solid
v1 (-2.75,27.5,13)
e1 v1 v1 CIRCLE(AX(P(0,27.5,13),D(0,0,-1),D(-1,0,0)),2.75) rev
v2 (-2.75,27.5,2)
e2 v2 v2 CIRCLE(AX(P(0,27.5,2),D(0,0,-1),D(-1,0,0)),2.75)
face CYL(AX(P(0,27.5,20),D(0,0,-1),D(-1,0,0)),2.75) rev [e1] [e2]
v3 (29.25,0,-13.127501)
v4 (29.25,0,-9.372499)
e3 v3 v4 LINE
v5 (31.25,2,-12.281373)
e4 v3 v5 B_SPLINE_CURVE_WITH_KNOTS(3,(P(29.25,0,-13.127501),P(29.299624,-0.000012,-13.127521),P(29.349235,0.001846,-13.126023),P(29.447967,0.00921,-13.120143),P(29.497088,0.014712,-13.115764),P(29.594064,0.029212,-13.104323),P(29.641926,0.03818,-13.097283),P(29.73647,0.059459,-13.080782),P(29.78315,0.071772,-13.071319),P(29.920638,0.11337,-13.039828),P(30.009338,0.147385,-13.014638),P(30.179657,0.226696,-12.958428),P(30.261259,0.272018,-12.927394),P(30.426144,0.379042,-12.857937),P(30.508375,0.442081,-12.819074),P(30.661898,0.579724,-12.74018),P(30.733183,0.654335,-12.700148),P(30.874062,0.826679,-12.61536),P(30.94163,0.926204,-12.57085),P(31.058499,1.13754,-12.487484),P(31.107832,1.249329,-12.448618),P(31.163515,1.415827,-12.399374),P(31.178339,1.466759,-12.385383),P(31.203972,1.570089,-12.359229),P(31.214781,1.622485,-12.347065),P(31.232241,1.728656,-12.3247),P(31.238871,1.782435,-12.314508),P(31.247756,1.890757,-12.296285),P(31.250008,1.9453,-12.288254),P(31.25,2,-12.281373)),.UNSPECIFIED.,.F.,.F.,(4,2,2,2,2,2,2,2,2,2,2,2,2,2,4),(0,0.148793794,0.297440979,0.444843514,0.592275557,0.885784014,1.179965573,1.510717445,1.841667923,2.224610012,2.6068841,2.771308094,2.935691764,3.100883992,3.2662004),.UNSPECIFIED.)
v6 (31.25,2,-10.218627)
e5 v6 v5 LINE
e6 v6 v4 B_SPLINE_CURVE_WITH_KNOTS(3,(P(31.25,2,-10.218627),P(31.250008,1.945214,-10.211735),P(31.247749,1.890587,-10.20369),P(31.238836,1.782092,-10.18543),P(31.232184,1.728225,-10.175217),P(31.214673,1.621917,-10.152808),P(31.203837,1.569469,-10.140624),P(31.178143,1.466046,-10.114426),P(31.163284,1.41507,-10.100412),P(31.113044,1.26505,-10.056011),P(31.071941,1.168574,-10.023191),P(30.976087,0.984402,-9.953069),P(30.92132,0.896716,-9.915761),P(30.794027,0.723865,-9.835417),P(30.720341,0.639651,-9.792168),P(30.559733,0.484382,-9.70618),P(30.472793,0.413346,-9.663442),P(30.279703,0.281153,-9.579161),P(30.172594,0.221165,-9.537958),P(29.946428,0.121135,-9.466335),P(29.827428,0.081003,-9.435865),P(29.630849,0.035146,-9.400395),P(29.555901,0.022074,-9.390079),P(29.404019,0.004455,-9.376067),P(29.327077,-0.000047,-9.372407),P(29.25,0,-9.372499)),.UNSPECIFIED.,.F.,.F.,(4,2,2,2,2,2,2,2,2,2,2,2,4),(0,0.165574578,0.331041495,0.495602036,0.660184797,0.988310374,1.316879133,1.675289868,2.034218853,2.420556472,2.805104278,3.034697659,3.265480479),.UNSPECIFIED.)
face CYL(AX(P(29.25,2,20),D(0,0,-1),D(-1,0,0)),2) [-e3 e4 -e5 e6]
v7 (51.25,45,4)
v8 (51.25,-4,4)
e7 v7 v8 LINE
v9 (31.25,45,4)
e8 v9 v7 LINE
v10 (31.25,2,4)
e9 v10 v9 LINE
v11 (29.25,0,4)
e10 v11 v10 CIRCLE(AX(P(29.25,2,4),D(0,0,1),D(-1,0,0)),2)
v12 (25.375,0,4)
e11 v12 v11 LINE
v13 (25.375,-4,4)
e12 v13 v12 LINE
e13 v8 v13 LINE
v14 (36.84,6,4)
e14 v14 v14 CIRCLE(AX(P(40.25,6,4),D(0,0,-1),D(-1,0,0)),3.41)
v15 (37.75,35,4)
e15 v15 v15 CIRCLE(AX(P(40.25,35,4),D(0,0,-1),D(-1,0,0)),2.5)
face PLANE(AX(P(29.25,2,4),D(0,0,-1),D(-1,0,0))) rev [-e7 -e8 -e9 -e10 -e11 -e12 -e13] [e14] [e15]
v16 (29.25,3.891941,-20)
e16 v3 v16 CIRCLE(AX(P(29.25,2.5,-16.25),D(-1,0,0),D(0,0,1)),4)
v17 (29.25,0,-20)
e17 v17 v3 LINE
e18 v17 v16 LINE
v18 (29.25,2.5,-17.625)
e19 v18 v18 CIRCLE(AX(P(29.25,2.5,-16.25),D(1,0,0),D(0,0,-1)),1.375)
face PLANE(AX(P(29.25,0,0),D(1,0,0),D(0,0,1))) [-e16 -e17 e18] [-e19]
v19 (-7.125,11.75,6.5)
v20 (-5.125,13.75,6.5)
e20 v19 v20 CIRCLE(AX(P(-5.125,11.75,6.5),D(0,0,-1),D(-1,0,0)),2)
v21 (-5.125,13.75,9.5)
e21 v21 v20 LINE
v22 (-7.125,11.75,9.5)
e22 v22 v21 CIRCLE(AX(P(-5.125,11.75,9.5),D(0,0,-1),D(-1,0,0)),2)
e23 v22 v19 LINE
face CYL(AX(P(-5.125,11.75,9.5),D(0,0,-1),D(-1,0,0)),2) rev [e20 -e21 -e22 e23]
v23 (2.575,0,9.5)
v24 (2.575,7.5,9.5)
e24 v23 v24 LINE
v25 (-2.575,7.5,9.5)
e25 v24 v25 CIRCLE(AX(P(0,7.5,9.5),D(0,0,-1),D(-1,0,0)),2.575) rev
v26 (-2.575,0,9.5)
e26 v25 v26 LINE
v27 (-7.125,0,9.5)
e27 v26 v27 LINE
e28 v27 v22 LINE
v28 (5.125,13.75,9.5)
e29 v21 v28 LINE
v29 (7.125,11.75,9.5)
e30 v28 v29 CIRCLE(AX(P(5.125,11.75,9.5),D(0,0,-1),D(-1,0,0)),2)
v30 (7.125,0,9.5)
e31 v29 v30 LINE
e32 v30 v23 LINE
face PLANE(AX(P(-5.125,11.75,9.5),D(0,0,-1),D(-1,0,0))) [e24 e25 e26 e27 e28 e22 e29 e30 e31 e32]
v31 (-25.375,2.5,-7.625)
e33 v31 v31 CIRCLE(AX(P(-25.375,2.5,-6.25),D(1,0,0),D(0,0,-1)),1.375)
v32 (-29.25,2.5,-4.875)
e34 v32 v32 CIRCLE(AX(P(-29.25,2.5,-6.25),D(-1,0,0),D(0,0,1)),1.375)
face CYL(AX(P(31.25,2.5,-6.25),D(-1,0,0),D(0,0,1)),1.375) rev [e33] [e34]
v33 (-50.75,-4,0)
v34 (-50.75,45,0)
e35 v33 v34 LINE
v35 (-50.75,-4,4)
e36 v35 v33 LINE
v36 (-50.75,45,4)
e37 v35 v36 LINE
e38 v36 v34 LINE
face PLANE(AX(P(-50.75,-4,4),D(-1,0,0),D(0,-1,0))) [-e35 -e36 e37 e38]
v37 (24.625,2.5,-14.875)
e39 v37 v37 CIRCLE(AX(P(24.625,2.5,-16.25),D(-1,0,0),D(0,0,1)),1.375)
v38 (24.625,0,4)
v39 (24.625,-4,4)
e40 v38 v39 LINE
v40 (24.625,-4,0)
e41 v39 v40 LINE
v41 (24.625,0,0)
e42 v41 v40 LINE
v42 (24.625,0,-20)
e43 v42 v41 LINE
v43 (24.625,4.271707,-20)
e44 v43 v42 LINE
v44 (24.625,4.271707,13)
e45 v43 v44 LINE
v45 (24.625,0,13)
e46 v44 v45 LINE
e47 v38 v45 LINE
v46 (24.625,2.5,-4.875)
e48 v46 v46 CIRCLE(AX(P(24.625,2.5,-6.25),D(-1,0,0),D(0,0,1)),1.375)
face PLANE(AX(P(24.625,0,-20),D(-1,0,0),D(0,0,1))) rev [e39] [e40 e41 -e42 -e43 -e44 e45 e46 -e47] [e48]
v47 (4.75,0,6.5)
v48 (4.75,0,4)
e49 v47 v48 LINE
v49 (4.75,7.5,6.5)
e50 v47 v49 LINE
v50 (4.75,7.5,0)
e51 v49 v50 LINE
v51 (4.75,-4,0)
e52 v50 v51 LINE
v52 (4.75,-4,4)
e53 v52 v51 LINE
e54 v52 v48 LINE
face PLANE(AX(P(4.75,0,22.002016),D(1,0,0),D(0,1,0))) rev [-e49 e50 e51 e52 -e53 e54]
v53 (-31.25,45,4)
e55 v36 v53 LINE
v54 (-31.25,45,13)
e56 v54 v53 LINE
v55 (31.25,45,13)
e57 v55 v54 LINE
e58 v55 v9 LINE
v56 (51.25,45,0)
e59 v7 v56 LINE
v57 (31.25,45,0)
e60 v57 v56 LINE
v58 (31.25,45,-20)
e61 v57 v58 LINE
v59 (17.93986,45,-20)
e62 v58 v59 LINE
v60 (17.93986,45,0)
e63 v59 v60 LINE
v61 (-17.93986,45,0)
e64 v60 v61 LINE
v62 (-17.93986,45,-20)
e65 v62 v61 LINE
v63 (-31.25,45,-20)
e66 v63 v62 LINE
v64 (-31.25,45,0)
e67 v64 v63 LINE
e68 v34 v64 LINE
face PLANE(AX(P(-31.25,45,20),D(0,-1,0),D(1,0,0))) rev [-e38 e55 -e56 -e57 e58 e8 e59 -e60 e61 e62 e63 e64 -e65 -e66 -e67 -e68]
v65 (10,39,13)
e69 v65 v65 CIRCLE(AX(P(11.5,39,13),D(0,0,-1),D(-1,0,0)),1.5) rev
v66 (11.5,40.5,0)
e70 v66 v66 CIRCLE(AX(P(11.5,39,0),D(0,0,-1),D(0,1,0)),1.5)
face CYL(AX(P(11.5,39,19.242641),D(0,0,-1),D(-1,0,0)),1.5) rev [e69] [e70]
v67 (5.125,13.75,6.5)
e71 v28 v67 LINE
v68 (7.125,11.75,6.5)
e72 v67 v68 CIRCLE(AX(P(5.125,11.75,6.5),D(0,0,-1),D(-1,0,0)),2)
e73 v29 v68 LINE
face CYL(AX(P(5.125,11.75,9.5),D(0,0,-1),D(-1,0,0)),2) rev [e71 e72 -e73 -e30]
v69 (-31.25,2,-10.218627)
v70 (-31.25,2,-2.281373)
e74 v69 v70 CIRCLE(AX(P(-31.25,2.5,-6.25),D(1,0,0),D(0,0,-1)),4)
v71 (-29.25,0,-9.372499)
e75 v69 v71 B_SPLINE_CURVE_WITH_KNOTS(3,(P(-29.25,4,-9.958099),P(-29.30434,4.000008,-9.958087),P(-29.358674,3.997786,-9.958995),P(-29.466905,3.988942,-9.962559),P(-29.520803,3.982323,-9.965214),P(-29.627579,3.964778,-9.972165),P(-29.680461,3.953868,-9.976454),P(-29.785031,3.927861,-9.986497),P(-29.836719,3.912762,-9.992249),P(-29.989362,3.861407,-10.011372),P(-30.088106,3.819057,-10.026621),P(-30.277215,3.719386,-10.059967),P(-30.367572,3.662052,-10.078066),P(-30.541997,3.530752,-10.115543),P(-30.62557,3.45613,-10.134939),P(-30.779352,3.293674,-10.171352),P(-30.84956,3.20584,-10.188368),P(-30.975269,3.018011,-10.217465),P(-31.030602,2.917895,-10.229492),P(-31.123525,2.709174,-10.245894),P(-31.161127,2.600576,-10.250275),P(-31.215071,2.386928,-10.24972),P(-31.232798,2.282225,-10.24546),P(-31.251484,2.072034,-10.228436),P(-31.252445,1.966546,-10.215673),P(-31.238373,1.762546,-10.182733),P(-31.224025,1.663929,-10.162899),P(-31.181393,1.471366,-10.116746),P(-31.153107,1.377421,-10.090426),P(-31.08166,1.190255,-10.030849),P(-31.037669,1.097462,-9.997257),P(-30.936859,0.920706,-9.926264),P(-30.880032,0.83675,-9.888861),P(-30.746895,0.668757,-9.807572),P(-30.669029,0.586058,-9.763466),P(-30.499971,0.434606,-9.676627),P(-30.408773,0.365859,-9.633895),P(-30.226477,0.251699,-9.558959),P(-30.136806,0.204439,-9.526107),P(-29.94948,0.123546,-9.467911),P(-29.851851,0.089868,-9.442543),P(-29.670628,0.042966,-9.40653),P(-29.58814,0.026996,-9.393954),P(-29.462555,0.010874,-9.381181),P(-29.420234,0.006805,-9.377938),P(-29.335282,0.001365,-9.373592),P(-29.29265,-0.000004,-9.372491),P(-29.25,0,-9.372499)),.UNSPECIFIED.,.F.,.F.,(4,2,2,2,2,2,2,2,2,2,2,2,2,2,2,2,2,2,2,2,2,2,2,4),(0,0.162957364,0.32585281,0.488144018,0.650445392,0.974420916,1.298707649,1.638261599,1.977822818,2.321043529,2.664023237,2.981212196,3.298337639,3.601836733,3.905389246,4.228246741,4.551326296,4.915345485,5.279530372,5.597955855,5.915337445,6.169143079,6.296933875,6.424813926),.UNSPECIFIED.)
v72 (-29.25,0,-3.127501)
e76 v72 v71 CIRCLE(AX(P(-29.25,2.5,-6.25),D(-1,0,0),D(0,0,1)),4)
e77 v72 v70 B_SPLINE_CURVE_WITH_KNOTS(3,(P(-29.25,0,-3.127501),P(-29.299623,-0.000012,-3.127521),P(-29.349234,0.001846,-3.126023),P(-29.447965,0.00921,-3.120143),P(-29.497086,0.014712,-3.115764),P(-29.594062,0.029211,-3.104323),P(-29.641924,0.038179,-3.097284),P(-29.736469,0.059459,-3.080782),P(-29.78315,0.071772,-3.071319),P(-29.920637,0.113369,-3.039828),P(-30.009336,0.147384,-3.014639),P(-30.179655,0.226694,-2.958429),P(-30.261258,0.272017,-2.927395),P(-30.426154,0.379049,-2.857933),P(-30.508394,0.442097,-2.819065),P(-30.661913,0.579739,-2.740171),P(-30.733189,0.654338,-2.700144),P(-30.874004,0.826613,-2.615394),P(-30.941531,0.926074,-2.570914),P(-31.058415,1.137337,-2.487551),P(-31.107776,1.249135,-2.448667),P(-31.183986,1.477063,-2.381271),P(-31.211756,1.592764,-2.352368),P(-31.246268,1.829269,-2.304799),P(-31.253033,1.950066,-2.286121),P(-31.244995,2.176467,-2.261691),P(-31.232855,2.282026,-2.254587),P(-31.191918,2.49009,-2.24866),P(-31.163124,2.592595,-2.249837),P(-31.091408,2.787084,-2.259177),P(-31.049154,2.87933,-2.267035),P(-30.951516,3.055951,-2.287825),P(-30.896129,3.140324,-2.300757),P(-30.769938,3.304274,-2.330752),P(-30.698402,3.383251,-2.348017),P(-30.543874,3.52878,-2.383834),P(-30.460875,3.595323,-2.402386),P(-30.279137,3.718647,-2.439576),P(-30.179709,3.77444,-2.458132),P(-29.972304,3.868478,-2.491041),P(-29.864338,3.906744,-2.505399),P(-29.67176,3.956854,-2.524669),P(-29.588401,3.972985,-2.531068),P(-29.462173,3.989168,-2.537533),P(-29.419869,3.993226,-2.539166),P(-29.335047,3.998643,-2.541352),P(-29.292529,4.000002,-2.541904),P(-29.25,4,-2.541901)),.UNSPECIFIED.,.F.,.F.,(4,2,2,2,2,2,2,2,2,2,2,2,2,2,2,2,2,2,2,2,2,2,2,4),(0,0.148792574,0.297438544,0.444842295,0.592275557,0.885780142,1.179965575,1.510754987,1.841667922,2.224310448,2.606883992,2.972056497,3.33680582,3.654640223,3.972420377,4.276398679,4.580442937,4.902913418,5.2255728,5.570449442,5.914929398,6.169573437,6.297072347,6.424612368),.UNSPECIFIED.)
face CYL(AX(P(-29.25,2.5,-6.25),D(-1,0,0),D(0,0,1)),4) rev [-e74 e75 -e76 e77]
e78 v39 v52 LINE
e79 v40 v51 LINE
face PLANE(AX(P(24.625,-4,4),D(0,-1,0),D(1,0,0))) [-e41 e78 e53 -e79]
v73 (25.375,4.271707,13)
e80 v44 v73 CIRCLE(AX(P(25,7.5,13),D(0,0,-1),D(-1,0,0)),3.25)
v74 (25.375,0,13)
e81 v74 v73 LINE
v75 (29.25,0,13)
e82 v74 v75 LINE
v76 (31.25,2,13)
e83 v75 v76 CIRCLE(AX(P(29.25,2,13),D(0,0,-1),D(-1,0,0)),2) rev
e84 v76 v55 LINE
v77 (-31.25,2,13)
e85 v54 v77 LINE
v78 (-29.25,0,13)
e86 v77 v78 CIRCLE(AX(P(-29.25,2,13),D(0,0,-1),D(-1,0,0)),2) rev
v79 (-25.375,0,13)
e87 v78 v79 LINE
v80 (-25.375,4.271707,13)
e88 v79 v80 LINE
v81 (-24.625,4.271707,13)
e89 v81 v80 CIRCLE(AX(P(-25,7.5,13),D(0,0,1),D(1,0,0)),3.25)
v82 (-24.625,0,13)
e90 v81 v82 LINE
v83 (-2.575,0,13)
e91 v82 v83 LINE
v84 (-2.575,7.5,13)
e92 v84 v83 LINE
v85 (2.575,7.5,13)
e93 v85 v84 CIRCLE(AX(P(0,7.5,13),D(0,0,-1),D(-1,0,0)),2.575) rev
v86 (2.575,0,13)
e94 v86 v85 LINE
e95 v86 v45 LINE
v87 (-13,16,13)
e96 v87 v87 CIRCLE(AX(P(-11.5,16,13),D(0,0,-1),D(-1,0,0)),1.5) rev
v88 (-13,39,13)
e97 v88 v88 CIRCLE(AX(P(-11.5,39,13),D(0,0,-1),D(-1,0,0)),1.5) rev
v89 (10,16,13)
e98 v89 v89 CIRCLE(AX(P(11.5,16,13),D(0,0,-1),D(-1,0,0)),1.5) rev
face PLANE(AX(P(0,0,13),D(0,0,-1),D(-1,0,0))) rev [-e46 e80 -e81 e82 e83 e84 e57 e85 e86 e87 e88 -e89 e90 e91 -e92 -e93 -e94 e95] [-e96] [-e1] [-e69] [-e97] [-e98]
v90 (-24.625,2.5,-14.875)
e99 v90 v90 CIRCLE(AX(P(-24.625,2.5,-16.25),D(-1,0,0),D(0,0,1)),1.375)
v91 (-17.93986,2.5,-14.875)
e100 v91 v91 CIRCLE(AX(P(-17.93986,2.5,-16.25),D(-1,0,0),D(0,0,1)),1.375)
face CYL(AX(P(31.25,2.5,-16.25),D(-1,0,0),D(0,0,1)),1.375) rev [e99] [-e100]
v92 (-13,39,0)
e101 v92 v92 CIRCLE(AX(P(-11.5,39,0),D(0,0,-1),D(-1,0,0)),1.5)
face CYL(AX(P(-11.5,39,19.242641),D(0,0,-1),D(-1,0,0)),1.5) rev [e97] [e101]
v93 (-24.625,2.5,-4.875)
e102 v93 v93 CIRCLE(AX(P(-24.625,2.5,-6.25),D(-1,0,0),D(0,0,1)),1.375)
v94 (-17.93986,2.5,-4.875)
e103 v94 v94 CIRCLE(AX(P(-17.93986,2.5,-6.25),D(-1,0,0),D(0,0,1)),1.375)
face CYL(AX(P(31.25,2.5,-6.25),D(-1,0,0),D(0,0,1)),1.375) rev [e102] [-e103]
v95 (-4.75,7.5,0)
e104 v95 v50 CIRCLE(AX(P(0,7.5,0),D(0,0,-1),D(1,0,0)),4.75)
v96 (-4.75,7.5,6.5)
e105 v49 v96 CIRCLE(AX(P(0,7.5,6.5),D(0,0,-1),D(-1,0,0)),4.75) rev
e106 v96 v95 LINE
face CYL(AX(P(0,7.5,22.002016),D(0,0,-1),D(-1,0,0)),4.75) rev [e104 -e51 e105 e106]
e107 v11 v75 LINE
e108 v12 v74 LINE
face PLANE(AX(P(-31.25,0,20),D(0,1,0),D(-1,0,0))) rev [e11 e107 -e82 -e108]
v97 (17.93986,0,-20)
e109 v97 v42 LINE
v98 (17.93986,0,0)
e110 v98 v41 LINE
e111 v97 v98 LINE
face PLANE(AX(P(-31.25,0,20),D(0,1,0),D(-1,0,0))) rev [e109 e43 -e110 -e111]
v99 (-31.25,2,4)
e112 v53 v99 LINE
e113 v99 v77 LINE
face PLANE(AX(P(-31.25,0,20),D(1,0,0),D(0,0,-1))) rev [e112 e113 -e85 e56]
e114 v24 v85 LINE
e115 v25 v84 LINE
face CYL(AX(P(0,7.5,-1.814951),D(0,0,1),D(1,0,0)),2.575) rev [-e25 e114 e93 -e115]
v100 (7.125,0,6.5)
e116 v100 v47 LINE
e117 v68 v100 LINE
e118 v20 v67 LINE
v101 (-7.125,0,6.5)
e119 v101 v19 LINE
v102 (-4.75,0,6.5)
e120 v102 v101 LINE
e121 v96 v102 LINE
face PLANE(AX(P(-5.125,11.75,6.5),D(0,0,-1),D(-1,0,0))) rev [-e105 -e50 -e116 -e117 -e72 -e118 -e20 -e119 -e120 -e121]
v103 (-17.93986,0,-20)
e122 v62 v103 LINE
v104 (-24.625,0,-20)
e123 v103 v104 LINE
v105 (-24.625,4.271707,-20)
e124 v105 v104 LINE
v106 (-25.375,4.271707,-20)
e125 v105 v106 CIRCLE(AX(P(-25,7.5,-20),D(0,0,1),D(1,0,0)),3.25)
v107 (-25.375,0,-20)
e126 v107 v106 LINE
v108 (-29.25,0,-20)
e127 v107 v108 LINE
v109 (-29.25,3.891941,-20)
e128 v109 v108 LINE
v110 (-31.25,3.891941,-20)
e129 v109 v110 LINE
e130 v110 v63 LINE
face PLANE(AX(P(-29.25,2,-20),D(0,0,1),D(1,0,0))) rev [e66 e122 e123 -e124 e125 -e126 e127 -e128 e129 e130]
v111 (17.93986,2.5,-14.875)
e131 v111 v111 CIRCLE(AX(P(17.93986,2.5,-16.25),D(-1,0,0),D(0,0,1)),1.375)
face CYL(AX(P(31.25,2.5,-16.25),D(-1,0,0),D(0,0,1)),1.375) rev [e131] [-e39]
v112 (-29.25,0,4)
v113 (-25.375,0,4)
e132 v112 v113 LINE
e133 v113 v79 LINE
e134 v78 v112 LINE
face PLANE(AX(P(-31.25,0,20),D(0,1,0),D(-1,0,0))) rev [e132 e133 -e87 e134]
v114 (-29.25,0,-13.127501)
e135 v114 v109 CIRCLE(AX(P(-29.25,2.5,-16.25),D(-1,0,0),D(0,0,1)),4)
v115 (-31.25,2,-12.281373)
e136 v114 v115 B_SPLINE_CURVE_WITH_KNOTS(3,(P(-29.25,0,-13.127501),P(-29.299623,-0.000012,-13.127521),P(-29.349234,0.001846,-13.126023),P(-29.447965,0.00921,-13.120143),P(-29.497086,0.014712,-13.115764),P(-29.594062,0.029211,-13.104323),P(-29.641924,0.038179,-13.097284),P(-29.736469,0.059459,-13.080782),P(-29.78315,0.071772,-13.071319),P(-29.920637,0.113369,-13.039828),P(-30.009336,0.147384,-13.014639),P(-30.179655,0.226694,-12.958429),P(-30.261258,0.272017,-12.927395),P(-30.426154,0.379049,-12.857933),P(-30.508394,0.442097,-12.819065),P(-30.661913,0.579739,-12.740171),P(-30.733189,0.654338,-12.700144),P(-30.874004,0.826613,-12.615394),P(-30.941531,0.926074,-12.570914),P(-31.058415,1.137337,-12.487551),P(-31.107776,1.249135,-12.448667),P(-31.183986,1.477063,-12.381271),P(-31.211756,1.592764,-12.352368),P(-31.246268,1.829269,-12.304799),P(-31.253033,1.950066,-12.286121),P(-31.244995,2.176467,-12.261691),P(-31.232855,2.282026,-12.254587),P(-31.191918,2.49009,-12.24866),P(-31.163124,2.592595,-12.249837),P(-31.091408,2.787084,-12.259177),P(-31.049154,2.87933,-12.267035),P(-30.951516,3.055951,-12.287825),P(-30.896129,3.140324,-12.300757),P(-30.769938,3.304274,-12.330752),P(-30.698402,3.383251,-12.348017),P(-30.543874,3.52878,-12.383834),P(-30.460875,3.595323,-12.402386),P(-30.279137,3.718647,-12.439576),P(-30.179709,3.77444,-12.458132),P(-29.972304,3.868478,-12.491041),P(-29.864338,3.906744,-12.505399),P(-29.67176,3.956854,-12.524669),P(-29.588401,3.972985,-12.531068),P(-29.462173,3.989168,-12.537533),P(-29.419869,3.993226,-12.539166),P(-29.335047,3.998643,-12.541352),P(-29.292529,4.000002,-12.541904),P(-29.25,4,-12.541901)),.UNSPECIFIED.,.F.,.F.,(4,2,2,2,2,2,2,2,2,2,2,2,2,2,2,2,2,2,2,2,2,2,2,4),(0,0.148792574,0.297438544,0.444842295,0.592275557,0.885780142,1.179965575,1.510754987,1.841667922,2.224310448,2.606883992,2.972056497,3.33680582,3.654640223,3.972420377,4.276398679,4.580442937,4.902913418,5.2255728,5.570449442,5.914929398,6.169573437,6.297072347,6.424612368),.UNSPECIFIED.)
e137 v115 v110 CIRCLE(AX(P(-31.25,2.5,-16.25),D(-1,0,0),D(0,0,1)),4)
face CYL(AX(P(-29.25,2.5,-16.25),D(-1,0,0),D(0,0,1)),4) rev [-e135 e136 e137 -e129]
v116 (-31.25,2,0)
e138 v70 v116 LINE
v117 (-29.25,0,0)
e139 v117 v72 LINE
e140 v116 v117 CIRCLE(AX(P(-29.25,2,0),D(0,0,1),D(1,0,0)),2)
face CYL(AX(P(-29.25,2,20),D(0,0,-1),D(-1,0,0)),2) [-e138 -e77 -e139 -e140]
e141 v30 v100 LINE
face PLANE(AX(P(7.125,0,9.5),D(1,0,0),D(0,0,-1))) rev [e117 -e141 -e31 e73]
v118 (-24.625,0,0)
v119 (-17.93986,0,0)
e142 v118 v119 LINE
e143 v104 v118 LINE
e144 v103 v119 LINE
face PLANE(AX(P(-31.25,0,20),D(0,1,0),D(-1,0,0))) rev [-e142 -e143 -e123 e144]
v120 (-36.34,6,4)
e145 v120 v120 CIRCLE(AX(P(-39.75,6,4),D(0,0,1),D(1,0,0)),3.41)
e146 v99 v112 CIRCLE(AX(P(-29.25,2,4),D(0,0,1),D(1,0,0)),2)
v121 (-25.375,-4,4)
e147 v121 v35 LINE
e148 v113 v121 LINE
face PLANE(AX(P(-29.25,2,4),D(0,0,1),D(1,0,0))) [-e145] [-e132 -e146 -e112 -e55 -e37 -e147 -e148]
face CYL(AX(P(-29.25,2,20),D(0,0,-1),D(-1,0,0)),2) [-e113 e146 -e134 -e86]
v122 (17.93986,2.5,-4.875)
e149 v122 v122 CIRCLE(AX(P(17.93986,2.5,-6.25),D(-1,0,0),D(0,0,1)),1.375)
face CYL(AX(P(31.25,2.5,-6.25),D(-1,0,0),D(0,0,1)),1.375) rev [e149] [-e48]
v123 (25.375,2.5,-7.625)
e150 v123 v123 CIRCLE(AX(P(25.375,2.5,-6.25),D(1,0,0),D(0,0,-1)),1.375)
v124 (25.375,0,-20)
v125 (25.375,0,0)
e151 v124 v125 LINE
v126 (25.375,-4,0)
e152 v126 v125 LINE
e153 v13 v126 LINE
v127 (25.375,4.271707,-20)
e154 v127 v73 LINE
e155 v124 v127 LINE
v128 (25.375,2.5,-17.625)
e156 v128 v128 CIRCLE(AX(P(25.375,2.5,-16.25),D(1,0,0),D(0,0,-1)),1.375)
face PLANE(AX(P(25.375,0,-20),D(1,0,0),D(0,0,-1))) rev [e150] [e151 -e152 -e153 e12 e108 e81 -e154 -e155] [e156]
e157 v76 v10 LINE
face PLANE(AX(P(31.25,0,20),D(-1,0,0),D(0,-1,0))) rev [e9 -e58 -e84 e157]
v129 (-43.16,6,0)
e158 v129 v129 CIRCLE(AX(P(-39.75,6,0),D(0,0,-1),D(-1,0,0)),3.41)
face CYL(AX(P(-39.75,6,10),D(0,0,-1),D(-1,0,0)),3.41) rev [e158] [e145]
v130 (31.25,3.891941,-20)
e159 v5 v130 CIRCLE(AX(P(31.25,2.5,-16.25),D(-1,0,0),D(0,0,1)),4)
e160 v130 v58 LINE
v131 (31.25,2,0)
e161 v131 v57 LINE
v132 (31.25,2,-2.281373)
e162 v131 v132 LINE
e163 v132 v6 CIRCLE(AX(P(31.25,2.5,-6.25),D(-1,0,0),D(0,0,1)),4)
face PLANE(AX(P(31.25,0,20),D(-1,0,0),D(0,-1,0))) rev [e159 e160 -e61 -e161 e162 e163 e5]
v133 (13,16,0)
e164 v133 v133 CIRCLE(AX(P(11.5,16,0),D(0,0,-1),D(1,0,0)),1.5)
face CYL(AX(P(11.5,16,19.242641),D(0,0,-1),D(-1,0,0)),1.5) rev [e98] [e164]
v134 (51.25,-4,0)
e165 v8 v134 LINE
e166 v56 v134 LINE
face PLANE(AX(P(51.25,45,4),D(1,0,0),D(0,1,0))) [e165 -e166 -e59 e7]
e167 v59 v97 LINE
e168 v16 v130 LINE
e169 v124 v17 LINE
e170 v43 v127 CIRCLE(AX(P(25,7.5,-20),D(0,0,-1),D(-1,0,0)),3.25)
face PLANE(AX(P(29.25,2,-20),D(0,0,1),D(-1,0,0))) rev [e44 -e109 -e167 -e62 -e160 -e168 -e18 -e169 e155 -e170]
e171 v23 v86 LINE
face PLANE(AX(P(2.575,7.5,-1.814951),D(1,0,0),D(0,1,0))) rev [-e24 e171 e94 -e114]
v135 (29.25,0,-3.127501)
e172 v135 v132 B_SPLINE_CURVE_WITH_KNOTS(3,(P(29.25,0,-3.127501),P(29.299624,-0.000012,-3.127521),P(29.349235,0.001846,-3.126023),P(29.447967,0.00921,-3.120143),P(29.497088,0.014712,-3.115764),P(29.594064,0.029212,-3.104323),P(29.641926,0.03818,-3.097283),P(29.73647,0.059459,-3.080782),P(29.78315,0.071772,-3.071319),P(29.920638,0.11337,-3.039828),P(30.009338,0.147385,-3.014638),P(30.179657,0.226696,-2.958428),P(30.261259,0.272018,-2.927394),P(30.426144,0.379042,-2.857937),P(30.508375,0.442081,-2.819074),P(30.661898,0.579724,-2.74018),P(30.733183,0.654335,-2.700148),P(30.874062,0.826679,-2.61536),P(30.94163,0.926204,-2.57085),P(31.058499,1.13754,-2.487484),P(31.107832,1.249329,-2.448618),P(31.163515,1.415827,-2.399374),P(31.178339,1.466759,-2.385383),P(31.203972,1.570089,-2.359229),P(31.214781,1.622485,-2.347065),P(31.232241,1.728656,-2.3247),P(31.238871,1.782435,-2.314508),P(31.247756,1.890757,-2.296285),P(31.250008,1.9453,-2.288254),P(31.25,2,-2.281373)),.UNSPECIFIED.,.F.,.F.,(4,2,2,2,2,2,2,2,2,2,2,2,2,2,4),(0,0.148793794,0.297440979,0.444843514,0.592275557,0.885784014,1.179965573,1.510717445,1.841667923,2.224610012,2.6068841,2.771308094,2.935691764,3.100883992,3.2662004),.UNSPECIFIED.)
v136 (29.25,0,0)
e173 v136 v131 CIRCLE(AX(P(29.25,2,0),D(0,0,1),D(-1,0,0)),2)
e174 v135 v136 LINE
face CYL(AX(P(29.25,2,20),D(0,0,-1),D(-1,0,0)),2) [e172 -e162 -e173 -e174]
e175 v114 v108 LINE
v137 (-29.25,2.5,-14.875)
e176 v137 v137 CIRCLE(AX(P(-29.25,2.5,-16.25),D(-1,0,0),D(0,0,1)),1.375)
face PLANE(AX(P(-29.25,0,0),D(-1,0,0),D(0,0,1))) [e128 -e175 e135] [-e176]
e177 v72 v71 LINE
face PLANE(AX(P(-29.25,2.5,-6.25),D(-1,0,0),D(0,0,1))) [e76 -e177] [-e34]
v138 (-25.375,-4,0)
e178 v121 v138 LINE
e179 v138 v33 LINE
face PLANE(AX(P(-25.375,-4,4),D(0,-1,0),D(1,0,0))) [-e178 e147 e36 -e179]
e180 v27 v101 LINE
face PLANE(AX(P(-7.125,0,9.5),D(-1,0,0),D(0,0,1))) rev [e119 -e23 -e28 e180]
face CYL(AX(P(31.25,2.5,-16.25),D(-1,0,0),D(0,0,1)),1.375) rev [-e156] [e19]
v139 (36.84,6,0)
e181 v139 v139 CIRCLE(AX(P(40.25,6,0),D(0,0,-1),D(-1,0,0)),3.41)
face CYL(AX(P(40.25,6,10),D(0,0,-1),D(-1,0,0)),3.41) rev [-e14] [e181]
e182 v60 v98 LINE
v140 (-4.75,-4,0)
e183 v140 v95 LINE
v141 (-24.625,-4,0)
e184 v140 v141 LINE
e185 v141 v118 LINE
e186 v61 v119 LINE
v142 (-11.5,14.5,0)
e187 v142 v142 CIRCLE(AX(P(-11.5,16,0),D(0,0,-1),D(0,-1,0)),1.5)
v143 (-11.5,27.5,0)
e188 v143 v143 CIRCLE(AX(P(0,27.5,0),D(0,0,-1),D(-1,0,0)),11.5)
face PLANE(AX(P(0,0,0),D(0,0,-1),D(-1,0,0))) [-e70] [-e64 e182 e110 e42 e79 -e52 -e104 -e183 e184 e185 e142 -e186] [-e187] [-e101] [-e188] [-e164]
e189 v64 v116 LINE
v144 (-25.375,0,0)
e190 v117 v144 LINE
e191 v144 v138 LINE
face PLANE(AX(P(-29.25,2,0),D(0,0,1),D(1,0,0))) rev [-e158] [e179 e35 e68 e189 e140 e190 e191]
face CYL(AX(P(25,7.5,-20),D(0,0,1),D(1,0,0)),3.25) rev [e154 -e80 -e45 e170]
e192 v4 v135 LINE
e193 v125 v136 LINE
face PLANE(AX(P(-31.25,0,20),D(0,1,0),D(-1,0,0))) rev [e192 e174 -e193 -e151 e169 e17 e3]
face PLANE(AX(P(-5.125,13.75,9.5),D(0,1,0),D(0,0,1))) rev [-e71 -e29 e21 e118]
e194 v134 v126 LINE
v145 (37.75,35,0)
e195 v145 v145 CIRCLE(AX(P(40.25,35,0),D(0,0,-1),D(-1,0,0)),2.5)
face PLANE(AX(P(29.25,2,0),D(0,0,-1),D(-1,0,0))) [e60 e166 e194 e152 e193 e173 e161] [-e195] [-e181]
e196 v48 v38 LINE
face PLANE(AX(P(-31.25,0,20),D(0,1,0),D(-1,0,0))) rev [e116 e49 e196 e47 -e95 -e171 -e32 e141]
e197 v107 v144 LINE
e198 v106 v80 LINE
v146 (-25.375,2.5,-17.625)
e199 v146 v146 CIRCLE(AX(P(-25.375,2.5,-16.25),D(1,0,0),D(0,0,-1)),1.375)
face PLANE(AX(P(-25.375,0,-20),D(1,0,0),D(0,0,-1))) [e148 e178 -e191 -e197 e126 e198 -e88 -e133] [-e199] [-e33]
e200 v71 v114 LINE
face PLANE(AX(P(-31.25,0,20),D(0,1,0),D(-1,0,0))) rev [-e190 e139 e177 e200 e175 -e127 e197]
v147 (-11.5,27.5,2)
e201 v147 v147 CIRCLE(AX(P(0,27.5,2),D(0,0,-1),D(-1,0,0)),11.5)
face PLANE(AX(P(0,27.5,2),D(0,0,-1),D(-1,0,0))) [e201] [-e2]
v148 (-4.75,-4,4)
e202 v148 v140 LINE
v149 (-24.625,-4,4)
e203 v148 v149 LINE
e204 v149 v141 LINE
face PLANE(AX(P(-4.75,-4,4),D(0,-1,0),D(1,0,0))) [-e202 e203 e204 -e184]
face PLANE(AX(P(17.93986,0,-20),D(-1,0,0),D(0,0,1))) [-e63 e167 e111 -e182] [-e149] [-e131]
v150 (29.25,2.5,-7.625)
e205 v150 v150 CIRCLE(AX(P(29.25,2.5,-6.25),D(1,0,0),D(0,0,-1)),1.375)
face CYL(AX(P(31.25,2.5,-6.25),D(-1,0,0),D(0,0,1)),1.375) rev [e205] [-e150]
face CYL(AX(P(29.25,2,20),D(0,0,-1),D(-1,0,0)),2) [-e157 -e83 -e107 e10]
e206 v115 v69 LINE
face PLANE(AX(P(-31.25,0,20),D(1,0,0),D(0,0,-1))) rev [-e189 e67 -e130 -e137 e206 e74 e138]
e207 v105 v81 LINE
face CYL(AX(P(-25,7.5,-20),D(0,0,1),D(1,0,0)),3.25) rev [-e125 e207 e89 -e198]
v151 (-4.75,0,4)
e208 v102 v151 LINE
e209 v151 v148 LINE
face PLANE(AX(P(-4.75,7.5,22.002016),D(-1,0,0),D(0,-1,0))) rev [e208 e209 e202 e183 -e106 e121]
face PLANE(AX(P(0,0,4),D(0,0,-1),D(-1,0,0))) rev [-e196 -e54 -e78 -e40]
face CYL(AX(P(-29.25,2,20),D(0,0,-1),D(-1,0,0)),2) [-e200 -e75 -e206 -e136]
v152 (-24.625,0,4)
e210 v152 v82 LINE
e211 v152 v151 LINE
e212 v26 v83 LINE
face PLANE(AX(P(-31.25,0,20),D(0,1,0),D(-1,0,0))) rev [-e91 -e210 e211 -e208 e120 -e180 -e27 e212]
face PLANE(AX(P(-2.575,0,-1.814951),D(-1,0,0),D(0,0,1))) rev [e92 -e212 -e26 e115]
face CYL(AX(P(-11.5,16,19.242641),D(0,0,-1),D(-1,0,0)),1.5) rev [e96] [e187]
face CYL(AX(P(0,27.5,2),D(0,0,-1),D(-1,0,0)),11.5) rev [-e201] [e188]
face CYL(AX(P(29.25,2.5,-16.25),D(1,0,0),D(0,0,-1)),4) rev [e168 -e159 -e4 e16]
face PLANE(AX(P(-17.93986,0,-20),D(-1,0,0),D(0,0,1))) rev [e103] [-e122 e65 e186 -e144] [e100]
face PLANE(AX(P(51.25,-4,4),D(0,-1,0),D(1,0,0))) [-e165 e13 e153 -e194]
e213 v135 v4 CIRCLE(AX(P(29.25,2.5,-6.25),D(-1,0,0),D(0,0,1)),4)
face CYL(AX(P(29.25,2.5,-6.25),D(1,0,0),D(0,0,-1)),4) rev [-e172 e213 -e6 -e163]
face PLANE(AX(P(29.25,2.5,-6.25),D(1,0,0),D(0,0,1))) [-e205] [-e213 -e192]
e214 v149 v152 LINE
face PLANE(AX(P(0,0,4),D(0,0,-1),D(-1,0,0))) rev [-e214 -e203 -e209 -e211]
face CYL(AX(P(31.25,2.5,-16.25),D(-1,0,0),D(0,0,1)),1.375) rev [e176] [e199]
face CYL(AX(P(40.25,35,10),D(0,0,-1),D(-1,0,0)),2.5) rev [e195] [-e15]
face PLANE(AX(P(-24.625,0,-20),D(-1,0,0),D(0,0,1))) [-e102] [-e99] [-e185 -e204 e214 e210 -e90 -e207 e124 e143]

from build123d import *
from build123d.topology import SkipClean

# Parameters (mm, degrees)
SKETCH1_W           = 62.5
SKETCH1_H           = 45
BOSS_EXTRUDE1_DEPTH = 20
SKETCH2_W           = 37.5
SKETCH2_H           = 45
CUT_EXTRUDE1_DEPTH  = 5
SKETCH3_R           = 11.5
CUT_EXTRUDE2_DEPTH  = 2
SKETCH4_R           = 1.5
CUT_EXTRUDE3_DEPTH  = 15
CIRPATTERN1_COUNT   = 4
SKETCH5_R           = 2.75
CUT_EXTRUDE4_DEPTH  = 58.667690261
CUT_EXTRUDE7_START  = -6.5
CUT_EXTRUDE7_DEPTH  = 3
CUT_EXTRUDE8_DEPTH  = 6.5
CUT_EXTRUDE9_DEPTH  = 5.5
SKETCH11_R          = 1.375
CUT_EXTRUDE10_DEPTH = 80.569152314
FILLET1_R           = 2
SKETCH12_R          = 3.625
CUT_EXTRUDE12_DEPTH = 3
BOSS_EXTRUDE2_START = 20
BOSS_EXTRUDE2_DEPTH = 20
SKETCH14_R          = 4
CUT_EXTRUDE18_DEPTH = 2
SKETCH15_W          = 62.5
SKETCH15_H          = 45
CUT_EXTRUDE19_DEPTH = 7
SKETCH16_R          = 3.25
CUT_EXTRUDE20_DEPTH = 64.957505524
SKETCH17_R          = 1.375
CUT_EXTRUDE21_DEPTH = 79.008012512
SKETCH18_W          = 19.875
SKETCH18_H          = 4
BOSS_EXTRUDE3_DEPTH = 4
SKETCH19_R          = 3.41
SKETCH19_R_2        = 2.5
CUT_EXTRUDE22_DEPTH = 10


with BuildPart() as part:
    # Sketch1 → Boss-Extrude1 (new body)
    with BuildSketch(Plane.XY):
        with Locations((0, 22.5)):
            Rectangle(SKETCH1_W, SKETCH1_H)
    extrude(amount=BOSS_EXTRUDE1_DEPTH)

    # Sketch2 → Cut-Extrude1 (cut)
    with BuildSketch(Plane.XY.offset(20)):
        with Locations((0, 22.5)):
            Rectangle(SKETCH2_W, SKETCH2_H)
    extrude(amount=-CUT_EXTRUDE1_DEPTH, mode=Mode.SUBTRACT)

    # Sketch3 → Cut-Extrude2 (cut)
    with BuildSketch(Plane(origin=(0, 0, 0), x_dir=(-1, 0, 0), z_dir=(0, 0, -1))):
        with Locations((0, 27.5)):
            Circle(SKETCH3_R)
    extrude(amount=-CUT_EXTRUDE2_DEPTH, mode=Mode.SUBTRACT)

    # Sketch4 → Cut-Extrude3 (cut)
    with BuildSketch(Plane(origin=(0, 0, 0), x_dir=(-1, 0, 0), z_dir=(0, 0, -1))):
        with Locations((11.5, 39)):
            Circle(SKETCH4_R)
    cut_extrude3 = extrude(amount=-CUT_EXTRUDE3_DEPTH, mode=Mode.SUBTRACT)

    # CirPattern1: Cut-Extrude3 ×4 about axis
    cirpattern1_axis = Axis((0, 27.5, 0), (0, 0, 1))
    for i in range(1, CIRPATTERN1_COUNT):
        add(cut_extrude3.rotate(cirpattern1_axis, i * 360 / CIRPATTERN1_COUNT), mode=Mode.SUBTRACT)

    # Sketch5 → Cut-Extrude4 (cut, through all)
    with BuildSketch(Plane(origin=(0, 0, 2), x_dir=(-1, 0, 0), z_dir=(0, 0, -1))):
        with Locations((0, 27.5)):
            Circle(SKETCH5_R)
    extrude(amount=-CUT_EXTRUDE4_DEPTH, mode=Mode.SUBTRACT)

    # Sketch8 → Cut-Extrude7 (cut)
    with BuildSketch(Plane(origin=(0, 0, 0), x_dir=(-1, 0, 0), z_dir=(0, 0, -1)).offset(CUT_EXTRUDE7_START)):
        with BuildLine():
            Line((7.125, 0), (-7.125, 0))
            Line((-7.125, 0), (-7.125, 11.75))
            ThreePointArc((-7.125, 11.75), (-6.539213562, 13.164213562), (-5.125, 13.75))
            Line((-5.125, 13.75), (5.125, 13.75))
            ThreePointArc((5.125, 13.75), (6.539213562, 13.164213562), (7.125, 11.75))
            Line((7.125, 11.75), (7.125, 0))
        make_face()
    extrude(amount=-CUT_EXTRUDE7_DEPTH, mode=Mode.SUBTRACT)

    # Sketch9 → Cut-Extrude8 (cut)
    with BuildSketch(Plane(origin=(0, 0, 0), x_dir=(-1, 0, 0), z_dir=(0, 0, -1))):
        with BuildLine():
            Line((4.75, 7.5), (4.75, 0))
            Line((4.75, 0), (-4.75, 0))
            Line((-4.75, 0), (-4.75, 7.5))
            ThreePointArc((-4.75, 7.5), (0, 12.25), (4.75, 7.5))
        make_face()
    extrude(amount=-CUT_EXTRUDE8_DEPTH, mode=Mode.SUBTRACT)

    # Sketch10 → Cut-Extrude9 (cut)
    with BuildSketch(Plane.XY.offset(15)):
        with BuildLine():
            Line((2.575, 7.5), (2.575, 0))
            Line((2.575, 0), (-2.575, 0))
            Line((-2.575, 0), (-2.575, 7.5))
            ThreePointArc((-2.575, 7.5), (0, 10.075), (2.575, 7.5))
        make_face()
    extrude(amount=-CUT_EXTRUDE9_DEPTH, mode=Mode.SUBTRACT)

    # Sketch11 → Cut-Extrude10 (cut, through all)
    with BuildSketch(Plane(origin=(31.25, 0, 0), x_dir=(0, 0, -1), z_dir=(1, 0, 0))):
        with Locations(Location((-17.5, 2.5, 0), (0, 0, 90))):
            Circle(SKETCH11_R)
    extrude(amount=-CUT_EXTRUDE10_DEPTH, mode=Mode.SUBTRACT)

    # Fillet1
    # the kernel refuses this fillet: 2 mm, written as the material it takes off along each edge
    with BuildSketch(Plane(origin=(31.25, 0, -5), x_dir=(0, 1, 0), z_dir=(0, 0, 1)), Plane(origin=(-31.25, 0, -5), x_dir=(1, 0, 0), z_dir=(0, 0, 1))) as fillet1_piece_1:
        with BuildLine():
            CenterArc((FILLET1_R, FILLET1_R), FILLET1_R, 180, 90)
            Line((0, FILLET1_R), (0, 0))
            Line((0, 0), (FILLET1_R, 0))
        make_face()
    extrude(amount=30, mode=Mode.SUBTRACT)

    # Sketch12 → Cut-Extrude12 (cut)
    with BuildSketch(Plane(origin=(31.25, 0, 0), x_dir=(0, 0, -1), z_dir=(1, 0, 0))):
        with Locations((-17.5, 2.5)):
            Circle(SKETCH12_R)
    cut_extrude12 = extrude(amount=-CUT_EXTRUDE12_DEPTH, mode=Mode.SUBTRACT)

    # Mirror3: Cut-Extrude12 across plane
    add(cut_extrude12.mirror(Plane(origin=(0, 0, 0), x_dir=(0, 0, 1), z_dir=(1, 0, 0))), mode=Mode.SUBTRACT)

    # Sketch13 → Boss-Extrude2 (add)
    with SkipClean():  # the faces are left unmerged after this step: merging them gives an invalid solid
        with BuildSketch(Plane(origin=(0, 0, 0), x_dir=(-1, 0, 0), z_dir=(0, 0, -1)).offset(BOSS_EXTRUDE2_START)):
            with BuildLine():
                Line((17.93986046, 0), (29.25, 0))
                ThreePointArc((29.25, 0), (30.664213562, 0.585786438), (31.25, 2))
                Line((31.25, 2), (31.25, 45))
                Line((31.25, 45), (17.93986046, 45))
                Line((17.93986046, 45), (17.93986046, 0))
            make_face()
        boss_extrude2 = extrude(amount=-BOSS_EXTRUDE2_DEPTH)

    # Sketch14 → Cut-Extrude18 (cut)
    with SkipClean():  # the faces are left unmerged after this step: merging them gives an invalid solid
        with BuildSketch(Plane.ZY.offset(31.25)):
            with BuildLine():
                ThreePointArc((-20, 3.891941091), (-20.187003937, 3.207106781), (-20.25, 2.5))
                ThreePointArc((-20.25, 2.5), (-19.58802197, 0.296001514), (-17.821195336, -1.178497685))
                ThreePointArc((-17.821195336, -1.178497685), (-14.259364049, -0.969491103), (-12.281373033, 2))
                Line((-12.281373033, 2), (-20, 2))
                Line((-20, 2), (-20, 3.891941091))
            make_face()
            with BuildLine():
                ThreePointArc((-12.25, 2.5), (-15.542893219, 6.437003937), (-20, 3.891941091))
                Line((-20, 3.891941091), (-20, 2))
                Line((-20, 2), (-12.281373033, 2))
                ThreePointArc((-12.281373033, 2), (-12.257850963, 2.24950835), (-12.25, 2.5))
            make_face()
            with BuildLine():
                ThreePointArc((-17.821195336, -1.178497685), (-19.58802197, 0.296001514), (-20.25, 2.5))
                Line((-20.25, 2.5), (-20.25, -1.178497685))
                Line((-20.25, -1.178497685), (-17.821195336, -1.178497685))
            make_face()
            with Locations((-6.25, 2.5)):
                Circle(SKETCH14_R)
        cut_extrude18 = extrude(amount=-CUT_EXTRUDE18_DEPTH, mode=Mode.SUBTRACT)

    # Sketch15 → Cut-Extrude19 (cut)
    with SkipClean():  # the faces are left unmerged after this step: merging them gives an invalid solid
        with BuildSketch(Plane.XY.offset(20)):
            with Locations((0, 22.5)):
                Rectangle(SKETCH15_W, SKETCH15_H)
        extrude(amount=-CUT_EXTRUDE19_DEPTH, mode=Mode.SUBTRACT)

    # Sketch16 → Cut-Extrude20 (cut, through all)
    with SkipClean():  # the faces are left unmerged after this step: merging them gives an invalid solid
        with BuildSketch(Plane.XY.offset(13)):
            with BuildLine():
                Line((-24.625, 0), (-24.625, 4.271707107))
                ThreePointArc((-24.625, 4.271707107), (-25, 4.25), (-25.375, 4.271707107))
                Line((-25.375, 4.271707107), (-25.375, 0))
                Line((-25.375, 0), (-24.625, 0))
            make_face()
            with Locations((-25, 7.5)):
                Circle(SKETCH16_R)
        cut_extrude20 = extrude(amount=-CUT_EXTRUDE20_DEPTH, mode=Mode.SUBTRACT)

    # Mirror4: Boss-Extrude2, Cut-Extrude18, Cut-Extrude20 across plane
    with SkipClean():  # the faces are left unmerged after this step: merging them gives an invalid solid
        add(boss_extrude2.mirror(Plane(origin=(0, 0, 0), x_dir=(0, 0, 1), z_dir=(1, 0, 0))))
        add(cut_extrude18.mirror(Plane(origin=(0, 0, 0), x_dir=(0, 0, 1), z_dir=(1, 0, 0))), mode=Mode.SUBTRACT)
        add(cut_extrude20.mirror(Plane(origin=(0, 0, 0), x_dir=(0, 0, 1), z_dir=(1, 0, 0))), mode=Mode.SUBTRACT)
    add(part.part.scale(1), mode=Mode.REPLACE)  # the faces are merged on a copy

    # Sketch17 → Cut-Extrude21 (cut, through all)
    with BuildSketch(Plane.ZY.offset(29.25)):
        with Locations(Location((-6.25, 2.5, 0), (0, 0, 180))):
            Circle(SKETCH17_R)
        with Locations(Location((-16.25, 2.5, 0), (0, 0, 180))):
            Circle(SKETCH17_R)
    extrude(amount=-CUT_EXTRUDE21_DEPTH, mode=Mode.SUBTRACT)

    # Sketch18 → Boss-Extrude3 (add)
    with BuildSketch(Plane(origin=(0, 0, 0), x_dir=(-1, 0, 0), z_dir=(0, 0, -1))):
        with BuildLine():
            Line((-51.25, 45), (-31.25, 45))
            Line((-31.25, 45), (-31.25, 2))
            ThreePointArc((-31.25, 2), (-30.664213562, 0.585786438), (-29.25, 0))
            Line((-29.25, 0), (-25.375, 0))
            Line((-25.375, 0), (-25.375, -4))
            Line((-25.375, -4), (-51.25, -4))
            Line((-51.25, -4), (-51.25, 45))
        make_face()
        with BuildLine():
            Line((50.75, -4), (50.75, 45))
            Line((50.75, 45), (31.25, 45))
            Line((31.25, 45), (31.25, 2))
            ThreePointArc((31.25, 2), (30.664213562, 0.585786438), (29.25, 0))
            Line((29.25, 0), (25.375, 0))
            Line((25.375, 0), (25.375, -4))
            Line((25.375, -4), (50.75, -4))
        make_face()
        with Locations((-14.6875, -2)):
            Rectangle(SKETCH18_W, SKETCH18_H)
        with Locations((14.6875, -2)):
            Rectangle(SKETCH18_W, SKETCH18_H)
    extrude(amount=-BOSS_EXTRUDE3_DEPTH)

    # Sketch19 → Cut-Extrude22 (cut)
    with BuildSketch(Plane(origin=(0, 0, 0), x_dir=(-1, 0, 0), z_dir=(0, 0, -1))):
        with Locations((-40.25, 6)):
            Circle(SKETCH19_R)
        with Locations((39.75, 6)):
            Circle(SKETCH19_R)
        with Locations((-40.25, 35)):
            Circle(SKETCH19_R_2)
    extrude(amount=-CUT_EXTRUDE22_DEPTH, mode=Mode.SUBTRACT)


solid = part.part
